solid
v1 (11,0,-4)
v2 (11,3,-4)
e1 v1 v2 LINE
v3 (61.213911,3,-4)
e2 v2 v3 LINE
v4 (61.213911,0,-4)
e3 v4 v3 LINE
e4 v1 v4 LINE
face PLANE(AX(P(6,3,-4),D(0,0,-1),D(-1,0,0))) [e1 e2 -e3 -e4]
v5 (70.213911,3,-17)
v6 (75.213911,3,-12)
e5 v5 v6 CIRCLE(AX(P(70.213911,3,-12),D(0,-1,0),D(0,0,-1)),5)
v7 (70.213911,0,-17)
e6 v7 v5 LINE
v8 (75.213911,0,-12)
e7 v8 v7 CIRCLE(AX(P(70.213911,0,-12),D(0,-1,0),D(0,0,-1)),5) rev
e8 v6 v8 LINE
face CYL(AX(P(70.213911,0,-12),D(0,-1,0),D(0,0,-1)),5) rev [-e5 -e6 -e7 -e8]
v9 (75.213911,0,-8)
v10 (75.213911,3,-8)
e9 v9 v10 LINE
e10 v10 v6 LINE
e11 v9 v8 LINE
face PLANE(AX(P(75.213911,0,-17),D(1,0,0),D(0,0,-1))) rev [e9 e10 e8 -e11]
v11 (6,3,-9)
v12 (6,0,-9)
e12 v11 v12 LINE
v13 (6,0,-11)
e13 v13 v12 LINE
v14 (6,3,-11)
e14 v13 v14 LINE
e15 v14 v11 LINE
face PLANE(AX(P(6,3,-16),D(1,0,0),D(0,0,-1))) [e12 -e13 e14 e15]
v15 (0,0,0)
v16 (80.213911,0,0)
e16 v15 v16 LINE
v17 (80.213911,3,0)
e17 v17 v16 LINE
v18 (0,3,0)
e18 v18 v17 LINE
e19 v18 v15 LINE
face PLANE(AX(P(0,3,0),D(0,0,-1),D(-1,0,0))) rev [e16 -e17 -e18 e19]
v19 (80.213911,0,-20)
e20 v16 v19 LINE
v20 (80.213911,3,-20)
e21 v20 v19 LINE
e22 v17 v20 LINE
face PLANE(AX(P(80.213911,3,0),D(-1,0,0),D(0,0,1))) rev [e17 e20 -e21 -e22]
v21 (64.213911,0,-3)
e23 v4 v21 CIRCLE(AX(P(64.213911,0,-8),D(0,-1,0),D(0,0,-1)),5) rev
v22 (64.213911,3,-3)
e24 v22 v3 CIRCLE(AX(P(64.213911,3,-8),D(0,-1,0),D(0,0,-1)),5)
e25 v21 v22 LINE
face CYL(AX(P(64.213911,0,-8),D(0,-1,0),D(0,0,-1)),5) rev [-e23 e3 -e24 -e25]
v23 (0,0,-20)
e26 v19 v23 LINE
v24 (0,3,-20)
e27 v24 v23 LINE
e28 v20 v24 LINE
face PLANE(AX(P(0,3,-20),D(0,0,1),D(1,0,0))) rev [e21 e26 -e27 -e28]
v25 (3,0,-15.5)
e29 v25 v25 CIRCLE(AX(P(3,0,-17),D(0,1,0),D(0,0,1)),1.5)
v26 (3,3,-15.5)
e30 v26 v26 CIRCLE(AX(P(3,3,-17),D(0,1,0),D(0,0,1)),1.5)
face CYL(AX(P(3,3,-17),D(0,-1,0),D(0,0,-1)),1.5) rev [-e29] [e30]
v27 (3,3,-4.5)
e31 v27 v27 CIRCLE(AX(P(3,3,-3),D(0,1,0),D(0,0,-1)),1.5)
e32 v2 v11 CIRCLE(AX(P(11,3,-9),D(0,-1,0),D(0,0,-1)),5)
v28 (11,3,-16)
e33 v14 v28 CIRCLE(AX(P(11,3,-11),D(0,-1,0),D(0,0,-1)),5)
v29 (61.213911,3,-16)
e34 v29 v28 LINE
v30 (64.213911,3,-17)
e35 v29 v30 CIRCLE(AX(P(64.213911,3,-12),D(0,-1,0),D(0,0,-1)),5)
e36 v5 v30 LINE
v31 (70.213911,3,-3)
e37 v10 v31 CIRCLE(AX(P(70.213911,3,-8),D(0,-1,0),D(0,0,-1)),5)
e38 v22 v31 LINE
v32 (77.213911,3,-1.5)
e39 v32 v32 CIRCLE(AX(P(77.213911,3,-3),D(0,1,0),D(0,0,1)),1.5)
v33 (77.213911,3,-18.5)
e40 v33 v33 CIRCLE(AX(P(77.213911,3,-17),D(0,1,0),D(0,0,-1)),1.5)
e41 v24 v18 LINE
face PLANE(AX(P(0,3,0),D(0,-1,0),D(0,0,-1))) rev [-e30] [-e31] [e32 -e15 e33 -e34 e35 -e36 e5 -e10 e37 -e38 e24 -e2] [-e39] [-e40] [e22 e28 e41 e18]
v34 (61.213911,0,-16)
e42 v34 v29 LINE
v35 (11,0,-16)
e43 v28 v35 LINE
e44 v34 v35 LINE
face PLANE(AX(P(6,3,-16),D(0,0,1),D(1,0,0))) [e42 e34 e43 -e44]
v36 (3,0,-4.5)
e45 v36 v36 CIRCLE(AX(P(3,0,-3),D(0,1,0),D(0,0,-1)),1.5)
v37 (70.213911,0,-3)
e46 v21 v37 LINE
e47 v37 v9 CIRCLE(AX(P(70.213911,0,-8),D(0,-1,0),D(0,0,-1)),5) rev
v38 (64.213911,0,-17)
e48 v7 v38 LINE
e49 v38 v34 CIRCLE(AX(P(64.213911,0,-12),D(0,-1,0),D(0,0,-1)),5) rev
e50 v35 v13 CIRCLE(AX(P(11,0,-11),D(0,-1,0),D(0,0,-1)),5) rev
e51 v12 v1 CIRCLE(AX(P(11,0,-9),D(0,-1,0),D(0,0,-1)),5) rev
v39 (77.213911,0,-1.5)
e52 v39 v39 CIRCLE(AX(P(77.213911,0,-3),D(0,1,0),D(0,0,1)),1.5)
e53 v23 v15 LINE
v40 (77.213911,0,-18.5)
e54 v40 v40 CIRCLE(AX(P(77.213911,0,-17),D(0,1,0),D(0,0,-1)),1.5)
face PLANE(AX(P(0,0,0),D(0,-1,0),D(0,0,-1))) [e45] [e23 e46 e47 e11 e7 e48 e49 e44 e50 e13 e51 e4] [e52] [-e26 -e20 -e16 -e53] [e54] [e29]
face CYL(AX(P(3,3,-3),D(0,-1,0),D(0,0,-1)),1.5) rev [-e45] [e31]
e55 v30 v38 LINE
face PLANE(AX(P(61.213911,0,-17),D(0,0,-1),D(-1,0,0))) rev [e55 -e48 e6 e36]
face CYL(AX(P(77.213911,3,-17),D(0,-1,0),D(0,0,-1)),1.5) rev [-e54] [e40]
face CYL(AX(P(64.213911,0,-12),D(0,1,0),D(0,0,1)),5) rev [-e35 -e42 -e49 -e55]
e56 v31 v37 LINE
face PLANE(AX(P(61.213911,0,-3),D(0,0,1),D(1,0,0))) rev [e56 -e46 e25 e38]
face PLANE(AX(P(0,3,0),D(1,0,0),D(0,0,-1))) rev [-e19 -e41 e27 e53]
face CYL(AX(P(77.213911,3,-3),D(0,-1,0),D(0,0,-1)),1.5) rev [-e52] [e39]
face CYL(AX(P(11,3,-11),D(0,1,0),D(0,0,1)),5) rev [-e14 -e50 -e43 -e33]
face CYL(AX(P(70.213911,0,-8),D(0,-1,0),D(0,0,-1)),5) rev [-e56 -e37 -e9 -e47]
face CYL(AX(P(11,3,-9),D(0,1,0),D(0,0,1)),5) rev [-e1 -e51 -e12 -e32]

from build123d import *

# Parameters (mm, degrees)
SKETCH1_W           = 80.213910902
SKETCH1_H           = 20
SKETCH1_R           = 1.5
SKETCH1_W_2         = 68.213910902
SKETCH1_H_2         = 12
BOSS_EXTRUDE1_DEPTH = 3
CUT_EXTRUDE1_DEPTH  = 83.724068458
FILLET1_R           = 5


with BuildPart() as part:
    # Sketch1 → Boss-Extrude1 (new body)
    with BuildSketch(Plane(origin=(0, 0, 0), x_dir=(1, 0, 0), z_dir=(0, 1, 0))):
        with Locations((40.106955451, 10)):
            Rectangle(SKETCH1_W, SKETCH1_H)
        with Locations(Location((3, 17, 0), (0, 0, 270))):
            Circle(SKETCH1_R, mode=Mode.SUBTRACT)
        with Locations(Location((3, 3, 0), (0, 0, 90))):
            Circle(SKETCH1_R, mode=Mode.SUBTRACT)
        with Locations(Location((77.213910902, 3, 0), (0, 0, 270))):
            Circle(SKETCH1_R, mode=Mode.SUBTRACT)
        with Locations(Location((77.213910902, 17, 0), (0, 0, 90))):
            Circle(SKETCH1_R, mode=Mode.SUBTRACT)
        with Locations((40.106955451, 10)):
            Rectangle(SKETCH1_W_2, SKETCH1_H_2, mode=Mode.SUBTRACT)
    extrude(amount=BOSS_EXTRUDE1_DEPTH)

    # Sketch2 → Cut-Extrude1 (cut, through all)
    with BuildSketch(Plane(origin=(0, 3, 0), x_dir=(1, 0, 0), z_dir=(0, 1, 0))):
        Polygon((61.213910902, 17), (61.213910902, 16), (74.213910902, 16), (74.213910902, 4), (61.213910902, 4), (61.213910902, 3), (75.213910902, 3), (75.213910902, 17), align=None)
    extrude(amount=-CUT_EXTRUDE1_DEPTH, mode=Mode.SUBTRACT)

    # Fillet1
    # the kernel refuses this fillet: 5 mm, written as the material it adds along each edge
    with BuildSketch(Plane(origin=(75.213910902, 3, -17), x_dir=(0, 0, 1), z_dir=(0, -1, 0)), Plane(origin=(75.213910902, 3, -3), x_dir=(-1, 0, 0), z_dir=(0, -1, 0)), Plane(origin=(6, 0, -16), x_dir=(0, 0, 1), z_dir=(0, 1, 0))) as fillet1_piece_1:
        with BuildLine():
            CenterArc((FILLET1_R, FILLET1_R), FILLET1_R, 180, 90)
            Line((0, FILLET1_R), (-FILLET1_R * 0.02, FILLET1_R))
            Line((-FILLET1_R * 0.02, FILLET1_R), (-FILLET1_R * 0.02, -FILLET1_R * 0.02))
            Line((-FILLET1_R * 0.02, -FILLET1_R * 0.02), (FILLET1_R, -FILLET1_R * 0.02))
            Line((FILLET1_R, -FILLET1_R * 0.02), (FILLET1_R, 0))
        make_face()
    extrude(amount=3)
    with BuildSketch(Plane(origin=(61.213910902, 3, -17), x_dir=(1, 0, 0), z_dir=(0, -1, 0))) as fillet1_piece_2:
        with BuildLine():
            CenterArc((3, 5), FILLET1_R, 233.130102354, 36.869897646)
            Line((0, 1), (-0.06, 0.92))
            ThreePointArc((-0.06, 0.92), (-0.1, 0.5), (-0.1, 0))
            Line((-0.1, 0), (0, -0.1))
            Line((0, -0.1), (3, -0.1))
            Line((3, -0.1), (3, 0))
        make_face()
    extrude(amount=3)
    with BuildSketch(Plane(origin=(61.213910902, 3, -3), x_dir=(0, 0, -1), z_dir=(0, -1, 0))) as fillet1_piece_3:
        with BuildLine():
            CenterArc((5, 3), FILLET1_R, 180, 36.869897646)
            Line((0, 3), (-0.1, 3))
            Line((-0.1, 3), (-0.1, 0))
            Line((-0.1, 0), (0, -0.1))
            ThreePointArc((0, -0.1), (0.5, -0.1), (0.92, -0.06))
            Line((0.92, -0.06), (1, 0))
        make_face()
    extrude(amount=3)
    with BuildSketch(Plane(origin=(6, 0, -4), x_dir=(0, 0, -1), z_dir=(0, 1, 0))) as fillet1_piece_4:
        with BuildLine():
            CenterArc((FILLET1_R, -FILLET1_R), FILLET1_R, 90, 90)
            Line((0, -FILLET1_R), (-FILLET1_R * 0.02, -FILLET1_R))
            Line((-FILLET1_R * 0.02, -FILLET1_R), (-FILLET1_R * 0.02, FILLET1_R * 0.02))
            Line((-FILLET1_R * 0.02, FILLET1_R * 0.02), (FILLET1_R, FILLET1_R * 0.02))
            Line((FILLET1_R, FILLET1_R * 0.02), (FILLET1_R, 0))
        make_face()
    extrude(amount=3)


solid = part.part
